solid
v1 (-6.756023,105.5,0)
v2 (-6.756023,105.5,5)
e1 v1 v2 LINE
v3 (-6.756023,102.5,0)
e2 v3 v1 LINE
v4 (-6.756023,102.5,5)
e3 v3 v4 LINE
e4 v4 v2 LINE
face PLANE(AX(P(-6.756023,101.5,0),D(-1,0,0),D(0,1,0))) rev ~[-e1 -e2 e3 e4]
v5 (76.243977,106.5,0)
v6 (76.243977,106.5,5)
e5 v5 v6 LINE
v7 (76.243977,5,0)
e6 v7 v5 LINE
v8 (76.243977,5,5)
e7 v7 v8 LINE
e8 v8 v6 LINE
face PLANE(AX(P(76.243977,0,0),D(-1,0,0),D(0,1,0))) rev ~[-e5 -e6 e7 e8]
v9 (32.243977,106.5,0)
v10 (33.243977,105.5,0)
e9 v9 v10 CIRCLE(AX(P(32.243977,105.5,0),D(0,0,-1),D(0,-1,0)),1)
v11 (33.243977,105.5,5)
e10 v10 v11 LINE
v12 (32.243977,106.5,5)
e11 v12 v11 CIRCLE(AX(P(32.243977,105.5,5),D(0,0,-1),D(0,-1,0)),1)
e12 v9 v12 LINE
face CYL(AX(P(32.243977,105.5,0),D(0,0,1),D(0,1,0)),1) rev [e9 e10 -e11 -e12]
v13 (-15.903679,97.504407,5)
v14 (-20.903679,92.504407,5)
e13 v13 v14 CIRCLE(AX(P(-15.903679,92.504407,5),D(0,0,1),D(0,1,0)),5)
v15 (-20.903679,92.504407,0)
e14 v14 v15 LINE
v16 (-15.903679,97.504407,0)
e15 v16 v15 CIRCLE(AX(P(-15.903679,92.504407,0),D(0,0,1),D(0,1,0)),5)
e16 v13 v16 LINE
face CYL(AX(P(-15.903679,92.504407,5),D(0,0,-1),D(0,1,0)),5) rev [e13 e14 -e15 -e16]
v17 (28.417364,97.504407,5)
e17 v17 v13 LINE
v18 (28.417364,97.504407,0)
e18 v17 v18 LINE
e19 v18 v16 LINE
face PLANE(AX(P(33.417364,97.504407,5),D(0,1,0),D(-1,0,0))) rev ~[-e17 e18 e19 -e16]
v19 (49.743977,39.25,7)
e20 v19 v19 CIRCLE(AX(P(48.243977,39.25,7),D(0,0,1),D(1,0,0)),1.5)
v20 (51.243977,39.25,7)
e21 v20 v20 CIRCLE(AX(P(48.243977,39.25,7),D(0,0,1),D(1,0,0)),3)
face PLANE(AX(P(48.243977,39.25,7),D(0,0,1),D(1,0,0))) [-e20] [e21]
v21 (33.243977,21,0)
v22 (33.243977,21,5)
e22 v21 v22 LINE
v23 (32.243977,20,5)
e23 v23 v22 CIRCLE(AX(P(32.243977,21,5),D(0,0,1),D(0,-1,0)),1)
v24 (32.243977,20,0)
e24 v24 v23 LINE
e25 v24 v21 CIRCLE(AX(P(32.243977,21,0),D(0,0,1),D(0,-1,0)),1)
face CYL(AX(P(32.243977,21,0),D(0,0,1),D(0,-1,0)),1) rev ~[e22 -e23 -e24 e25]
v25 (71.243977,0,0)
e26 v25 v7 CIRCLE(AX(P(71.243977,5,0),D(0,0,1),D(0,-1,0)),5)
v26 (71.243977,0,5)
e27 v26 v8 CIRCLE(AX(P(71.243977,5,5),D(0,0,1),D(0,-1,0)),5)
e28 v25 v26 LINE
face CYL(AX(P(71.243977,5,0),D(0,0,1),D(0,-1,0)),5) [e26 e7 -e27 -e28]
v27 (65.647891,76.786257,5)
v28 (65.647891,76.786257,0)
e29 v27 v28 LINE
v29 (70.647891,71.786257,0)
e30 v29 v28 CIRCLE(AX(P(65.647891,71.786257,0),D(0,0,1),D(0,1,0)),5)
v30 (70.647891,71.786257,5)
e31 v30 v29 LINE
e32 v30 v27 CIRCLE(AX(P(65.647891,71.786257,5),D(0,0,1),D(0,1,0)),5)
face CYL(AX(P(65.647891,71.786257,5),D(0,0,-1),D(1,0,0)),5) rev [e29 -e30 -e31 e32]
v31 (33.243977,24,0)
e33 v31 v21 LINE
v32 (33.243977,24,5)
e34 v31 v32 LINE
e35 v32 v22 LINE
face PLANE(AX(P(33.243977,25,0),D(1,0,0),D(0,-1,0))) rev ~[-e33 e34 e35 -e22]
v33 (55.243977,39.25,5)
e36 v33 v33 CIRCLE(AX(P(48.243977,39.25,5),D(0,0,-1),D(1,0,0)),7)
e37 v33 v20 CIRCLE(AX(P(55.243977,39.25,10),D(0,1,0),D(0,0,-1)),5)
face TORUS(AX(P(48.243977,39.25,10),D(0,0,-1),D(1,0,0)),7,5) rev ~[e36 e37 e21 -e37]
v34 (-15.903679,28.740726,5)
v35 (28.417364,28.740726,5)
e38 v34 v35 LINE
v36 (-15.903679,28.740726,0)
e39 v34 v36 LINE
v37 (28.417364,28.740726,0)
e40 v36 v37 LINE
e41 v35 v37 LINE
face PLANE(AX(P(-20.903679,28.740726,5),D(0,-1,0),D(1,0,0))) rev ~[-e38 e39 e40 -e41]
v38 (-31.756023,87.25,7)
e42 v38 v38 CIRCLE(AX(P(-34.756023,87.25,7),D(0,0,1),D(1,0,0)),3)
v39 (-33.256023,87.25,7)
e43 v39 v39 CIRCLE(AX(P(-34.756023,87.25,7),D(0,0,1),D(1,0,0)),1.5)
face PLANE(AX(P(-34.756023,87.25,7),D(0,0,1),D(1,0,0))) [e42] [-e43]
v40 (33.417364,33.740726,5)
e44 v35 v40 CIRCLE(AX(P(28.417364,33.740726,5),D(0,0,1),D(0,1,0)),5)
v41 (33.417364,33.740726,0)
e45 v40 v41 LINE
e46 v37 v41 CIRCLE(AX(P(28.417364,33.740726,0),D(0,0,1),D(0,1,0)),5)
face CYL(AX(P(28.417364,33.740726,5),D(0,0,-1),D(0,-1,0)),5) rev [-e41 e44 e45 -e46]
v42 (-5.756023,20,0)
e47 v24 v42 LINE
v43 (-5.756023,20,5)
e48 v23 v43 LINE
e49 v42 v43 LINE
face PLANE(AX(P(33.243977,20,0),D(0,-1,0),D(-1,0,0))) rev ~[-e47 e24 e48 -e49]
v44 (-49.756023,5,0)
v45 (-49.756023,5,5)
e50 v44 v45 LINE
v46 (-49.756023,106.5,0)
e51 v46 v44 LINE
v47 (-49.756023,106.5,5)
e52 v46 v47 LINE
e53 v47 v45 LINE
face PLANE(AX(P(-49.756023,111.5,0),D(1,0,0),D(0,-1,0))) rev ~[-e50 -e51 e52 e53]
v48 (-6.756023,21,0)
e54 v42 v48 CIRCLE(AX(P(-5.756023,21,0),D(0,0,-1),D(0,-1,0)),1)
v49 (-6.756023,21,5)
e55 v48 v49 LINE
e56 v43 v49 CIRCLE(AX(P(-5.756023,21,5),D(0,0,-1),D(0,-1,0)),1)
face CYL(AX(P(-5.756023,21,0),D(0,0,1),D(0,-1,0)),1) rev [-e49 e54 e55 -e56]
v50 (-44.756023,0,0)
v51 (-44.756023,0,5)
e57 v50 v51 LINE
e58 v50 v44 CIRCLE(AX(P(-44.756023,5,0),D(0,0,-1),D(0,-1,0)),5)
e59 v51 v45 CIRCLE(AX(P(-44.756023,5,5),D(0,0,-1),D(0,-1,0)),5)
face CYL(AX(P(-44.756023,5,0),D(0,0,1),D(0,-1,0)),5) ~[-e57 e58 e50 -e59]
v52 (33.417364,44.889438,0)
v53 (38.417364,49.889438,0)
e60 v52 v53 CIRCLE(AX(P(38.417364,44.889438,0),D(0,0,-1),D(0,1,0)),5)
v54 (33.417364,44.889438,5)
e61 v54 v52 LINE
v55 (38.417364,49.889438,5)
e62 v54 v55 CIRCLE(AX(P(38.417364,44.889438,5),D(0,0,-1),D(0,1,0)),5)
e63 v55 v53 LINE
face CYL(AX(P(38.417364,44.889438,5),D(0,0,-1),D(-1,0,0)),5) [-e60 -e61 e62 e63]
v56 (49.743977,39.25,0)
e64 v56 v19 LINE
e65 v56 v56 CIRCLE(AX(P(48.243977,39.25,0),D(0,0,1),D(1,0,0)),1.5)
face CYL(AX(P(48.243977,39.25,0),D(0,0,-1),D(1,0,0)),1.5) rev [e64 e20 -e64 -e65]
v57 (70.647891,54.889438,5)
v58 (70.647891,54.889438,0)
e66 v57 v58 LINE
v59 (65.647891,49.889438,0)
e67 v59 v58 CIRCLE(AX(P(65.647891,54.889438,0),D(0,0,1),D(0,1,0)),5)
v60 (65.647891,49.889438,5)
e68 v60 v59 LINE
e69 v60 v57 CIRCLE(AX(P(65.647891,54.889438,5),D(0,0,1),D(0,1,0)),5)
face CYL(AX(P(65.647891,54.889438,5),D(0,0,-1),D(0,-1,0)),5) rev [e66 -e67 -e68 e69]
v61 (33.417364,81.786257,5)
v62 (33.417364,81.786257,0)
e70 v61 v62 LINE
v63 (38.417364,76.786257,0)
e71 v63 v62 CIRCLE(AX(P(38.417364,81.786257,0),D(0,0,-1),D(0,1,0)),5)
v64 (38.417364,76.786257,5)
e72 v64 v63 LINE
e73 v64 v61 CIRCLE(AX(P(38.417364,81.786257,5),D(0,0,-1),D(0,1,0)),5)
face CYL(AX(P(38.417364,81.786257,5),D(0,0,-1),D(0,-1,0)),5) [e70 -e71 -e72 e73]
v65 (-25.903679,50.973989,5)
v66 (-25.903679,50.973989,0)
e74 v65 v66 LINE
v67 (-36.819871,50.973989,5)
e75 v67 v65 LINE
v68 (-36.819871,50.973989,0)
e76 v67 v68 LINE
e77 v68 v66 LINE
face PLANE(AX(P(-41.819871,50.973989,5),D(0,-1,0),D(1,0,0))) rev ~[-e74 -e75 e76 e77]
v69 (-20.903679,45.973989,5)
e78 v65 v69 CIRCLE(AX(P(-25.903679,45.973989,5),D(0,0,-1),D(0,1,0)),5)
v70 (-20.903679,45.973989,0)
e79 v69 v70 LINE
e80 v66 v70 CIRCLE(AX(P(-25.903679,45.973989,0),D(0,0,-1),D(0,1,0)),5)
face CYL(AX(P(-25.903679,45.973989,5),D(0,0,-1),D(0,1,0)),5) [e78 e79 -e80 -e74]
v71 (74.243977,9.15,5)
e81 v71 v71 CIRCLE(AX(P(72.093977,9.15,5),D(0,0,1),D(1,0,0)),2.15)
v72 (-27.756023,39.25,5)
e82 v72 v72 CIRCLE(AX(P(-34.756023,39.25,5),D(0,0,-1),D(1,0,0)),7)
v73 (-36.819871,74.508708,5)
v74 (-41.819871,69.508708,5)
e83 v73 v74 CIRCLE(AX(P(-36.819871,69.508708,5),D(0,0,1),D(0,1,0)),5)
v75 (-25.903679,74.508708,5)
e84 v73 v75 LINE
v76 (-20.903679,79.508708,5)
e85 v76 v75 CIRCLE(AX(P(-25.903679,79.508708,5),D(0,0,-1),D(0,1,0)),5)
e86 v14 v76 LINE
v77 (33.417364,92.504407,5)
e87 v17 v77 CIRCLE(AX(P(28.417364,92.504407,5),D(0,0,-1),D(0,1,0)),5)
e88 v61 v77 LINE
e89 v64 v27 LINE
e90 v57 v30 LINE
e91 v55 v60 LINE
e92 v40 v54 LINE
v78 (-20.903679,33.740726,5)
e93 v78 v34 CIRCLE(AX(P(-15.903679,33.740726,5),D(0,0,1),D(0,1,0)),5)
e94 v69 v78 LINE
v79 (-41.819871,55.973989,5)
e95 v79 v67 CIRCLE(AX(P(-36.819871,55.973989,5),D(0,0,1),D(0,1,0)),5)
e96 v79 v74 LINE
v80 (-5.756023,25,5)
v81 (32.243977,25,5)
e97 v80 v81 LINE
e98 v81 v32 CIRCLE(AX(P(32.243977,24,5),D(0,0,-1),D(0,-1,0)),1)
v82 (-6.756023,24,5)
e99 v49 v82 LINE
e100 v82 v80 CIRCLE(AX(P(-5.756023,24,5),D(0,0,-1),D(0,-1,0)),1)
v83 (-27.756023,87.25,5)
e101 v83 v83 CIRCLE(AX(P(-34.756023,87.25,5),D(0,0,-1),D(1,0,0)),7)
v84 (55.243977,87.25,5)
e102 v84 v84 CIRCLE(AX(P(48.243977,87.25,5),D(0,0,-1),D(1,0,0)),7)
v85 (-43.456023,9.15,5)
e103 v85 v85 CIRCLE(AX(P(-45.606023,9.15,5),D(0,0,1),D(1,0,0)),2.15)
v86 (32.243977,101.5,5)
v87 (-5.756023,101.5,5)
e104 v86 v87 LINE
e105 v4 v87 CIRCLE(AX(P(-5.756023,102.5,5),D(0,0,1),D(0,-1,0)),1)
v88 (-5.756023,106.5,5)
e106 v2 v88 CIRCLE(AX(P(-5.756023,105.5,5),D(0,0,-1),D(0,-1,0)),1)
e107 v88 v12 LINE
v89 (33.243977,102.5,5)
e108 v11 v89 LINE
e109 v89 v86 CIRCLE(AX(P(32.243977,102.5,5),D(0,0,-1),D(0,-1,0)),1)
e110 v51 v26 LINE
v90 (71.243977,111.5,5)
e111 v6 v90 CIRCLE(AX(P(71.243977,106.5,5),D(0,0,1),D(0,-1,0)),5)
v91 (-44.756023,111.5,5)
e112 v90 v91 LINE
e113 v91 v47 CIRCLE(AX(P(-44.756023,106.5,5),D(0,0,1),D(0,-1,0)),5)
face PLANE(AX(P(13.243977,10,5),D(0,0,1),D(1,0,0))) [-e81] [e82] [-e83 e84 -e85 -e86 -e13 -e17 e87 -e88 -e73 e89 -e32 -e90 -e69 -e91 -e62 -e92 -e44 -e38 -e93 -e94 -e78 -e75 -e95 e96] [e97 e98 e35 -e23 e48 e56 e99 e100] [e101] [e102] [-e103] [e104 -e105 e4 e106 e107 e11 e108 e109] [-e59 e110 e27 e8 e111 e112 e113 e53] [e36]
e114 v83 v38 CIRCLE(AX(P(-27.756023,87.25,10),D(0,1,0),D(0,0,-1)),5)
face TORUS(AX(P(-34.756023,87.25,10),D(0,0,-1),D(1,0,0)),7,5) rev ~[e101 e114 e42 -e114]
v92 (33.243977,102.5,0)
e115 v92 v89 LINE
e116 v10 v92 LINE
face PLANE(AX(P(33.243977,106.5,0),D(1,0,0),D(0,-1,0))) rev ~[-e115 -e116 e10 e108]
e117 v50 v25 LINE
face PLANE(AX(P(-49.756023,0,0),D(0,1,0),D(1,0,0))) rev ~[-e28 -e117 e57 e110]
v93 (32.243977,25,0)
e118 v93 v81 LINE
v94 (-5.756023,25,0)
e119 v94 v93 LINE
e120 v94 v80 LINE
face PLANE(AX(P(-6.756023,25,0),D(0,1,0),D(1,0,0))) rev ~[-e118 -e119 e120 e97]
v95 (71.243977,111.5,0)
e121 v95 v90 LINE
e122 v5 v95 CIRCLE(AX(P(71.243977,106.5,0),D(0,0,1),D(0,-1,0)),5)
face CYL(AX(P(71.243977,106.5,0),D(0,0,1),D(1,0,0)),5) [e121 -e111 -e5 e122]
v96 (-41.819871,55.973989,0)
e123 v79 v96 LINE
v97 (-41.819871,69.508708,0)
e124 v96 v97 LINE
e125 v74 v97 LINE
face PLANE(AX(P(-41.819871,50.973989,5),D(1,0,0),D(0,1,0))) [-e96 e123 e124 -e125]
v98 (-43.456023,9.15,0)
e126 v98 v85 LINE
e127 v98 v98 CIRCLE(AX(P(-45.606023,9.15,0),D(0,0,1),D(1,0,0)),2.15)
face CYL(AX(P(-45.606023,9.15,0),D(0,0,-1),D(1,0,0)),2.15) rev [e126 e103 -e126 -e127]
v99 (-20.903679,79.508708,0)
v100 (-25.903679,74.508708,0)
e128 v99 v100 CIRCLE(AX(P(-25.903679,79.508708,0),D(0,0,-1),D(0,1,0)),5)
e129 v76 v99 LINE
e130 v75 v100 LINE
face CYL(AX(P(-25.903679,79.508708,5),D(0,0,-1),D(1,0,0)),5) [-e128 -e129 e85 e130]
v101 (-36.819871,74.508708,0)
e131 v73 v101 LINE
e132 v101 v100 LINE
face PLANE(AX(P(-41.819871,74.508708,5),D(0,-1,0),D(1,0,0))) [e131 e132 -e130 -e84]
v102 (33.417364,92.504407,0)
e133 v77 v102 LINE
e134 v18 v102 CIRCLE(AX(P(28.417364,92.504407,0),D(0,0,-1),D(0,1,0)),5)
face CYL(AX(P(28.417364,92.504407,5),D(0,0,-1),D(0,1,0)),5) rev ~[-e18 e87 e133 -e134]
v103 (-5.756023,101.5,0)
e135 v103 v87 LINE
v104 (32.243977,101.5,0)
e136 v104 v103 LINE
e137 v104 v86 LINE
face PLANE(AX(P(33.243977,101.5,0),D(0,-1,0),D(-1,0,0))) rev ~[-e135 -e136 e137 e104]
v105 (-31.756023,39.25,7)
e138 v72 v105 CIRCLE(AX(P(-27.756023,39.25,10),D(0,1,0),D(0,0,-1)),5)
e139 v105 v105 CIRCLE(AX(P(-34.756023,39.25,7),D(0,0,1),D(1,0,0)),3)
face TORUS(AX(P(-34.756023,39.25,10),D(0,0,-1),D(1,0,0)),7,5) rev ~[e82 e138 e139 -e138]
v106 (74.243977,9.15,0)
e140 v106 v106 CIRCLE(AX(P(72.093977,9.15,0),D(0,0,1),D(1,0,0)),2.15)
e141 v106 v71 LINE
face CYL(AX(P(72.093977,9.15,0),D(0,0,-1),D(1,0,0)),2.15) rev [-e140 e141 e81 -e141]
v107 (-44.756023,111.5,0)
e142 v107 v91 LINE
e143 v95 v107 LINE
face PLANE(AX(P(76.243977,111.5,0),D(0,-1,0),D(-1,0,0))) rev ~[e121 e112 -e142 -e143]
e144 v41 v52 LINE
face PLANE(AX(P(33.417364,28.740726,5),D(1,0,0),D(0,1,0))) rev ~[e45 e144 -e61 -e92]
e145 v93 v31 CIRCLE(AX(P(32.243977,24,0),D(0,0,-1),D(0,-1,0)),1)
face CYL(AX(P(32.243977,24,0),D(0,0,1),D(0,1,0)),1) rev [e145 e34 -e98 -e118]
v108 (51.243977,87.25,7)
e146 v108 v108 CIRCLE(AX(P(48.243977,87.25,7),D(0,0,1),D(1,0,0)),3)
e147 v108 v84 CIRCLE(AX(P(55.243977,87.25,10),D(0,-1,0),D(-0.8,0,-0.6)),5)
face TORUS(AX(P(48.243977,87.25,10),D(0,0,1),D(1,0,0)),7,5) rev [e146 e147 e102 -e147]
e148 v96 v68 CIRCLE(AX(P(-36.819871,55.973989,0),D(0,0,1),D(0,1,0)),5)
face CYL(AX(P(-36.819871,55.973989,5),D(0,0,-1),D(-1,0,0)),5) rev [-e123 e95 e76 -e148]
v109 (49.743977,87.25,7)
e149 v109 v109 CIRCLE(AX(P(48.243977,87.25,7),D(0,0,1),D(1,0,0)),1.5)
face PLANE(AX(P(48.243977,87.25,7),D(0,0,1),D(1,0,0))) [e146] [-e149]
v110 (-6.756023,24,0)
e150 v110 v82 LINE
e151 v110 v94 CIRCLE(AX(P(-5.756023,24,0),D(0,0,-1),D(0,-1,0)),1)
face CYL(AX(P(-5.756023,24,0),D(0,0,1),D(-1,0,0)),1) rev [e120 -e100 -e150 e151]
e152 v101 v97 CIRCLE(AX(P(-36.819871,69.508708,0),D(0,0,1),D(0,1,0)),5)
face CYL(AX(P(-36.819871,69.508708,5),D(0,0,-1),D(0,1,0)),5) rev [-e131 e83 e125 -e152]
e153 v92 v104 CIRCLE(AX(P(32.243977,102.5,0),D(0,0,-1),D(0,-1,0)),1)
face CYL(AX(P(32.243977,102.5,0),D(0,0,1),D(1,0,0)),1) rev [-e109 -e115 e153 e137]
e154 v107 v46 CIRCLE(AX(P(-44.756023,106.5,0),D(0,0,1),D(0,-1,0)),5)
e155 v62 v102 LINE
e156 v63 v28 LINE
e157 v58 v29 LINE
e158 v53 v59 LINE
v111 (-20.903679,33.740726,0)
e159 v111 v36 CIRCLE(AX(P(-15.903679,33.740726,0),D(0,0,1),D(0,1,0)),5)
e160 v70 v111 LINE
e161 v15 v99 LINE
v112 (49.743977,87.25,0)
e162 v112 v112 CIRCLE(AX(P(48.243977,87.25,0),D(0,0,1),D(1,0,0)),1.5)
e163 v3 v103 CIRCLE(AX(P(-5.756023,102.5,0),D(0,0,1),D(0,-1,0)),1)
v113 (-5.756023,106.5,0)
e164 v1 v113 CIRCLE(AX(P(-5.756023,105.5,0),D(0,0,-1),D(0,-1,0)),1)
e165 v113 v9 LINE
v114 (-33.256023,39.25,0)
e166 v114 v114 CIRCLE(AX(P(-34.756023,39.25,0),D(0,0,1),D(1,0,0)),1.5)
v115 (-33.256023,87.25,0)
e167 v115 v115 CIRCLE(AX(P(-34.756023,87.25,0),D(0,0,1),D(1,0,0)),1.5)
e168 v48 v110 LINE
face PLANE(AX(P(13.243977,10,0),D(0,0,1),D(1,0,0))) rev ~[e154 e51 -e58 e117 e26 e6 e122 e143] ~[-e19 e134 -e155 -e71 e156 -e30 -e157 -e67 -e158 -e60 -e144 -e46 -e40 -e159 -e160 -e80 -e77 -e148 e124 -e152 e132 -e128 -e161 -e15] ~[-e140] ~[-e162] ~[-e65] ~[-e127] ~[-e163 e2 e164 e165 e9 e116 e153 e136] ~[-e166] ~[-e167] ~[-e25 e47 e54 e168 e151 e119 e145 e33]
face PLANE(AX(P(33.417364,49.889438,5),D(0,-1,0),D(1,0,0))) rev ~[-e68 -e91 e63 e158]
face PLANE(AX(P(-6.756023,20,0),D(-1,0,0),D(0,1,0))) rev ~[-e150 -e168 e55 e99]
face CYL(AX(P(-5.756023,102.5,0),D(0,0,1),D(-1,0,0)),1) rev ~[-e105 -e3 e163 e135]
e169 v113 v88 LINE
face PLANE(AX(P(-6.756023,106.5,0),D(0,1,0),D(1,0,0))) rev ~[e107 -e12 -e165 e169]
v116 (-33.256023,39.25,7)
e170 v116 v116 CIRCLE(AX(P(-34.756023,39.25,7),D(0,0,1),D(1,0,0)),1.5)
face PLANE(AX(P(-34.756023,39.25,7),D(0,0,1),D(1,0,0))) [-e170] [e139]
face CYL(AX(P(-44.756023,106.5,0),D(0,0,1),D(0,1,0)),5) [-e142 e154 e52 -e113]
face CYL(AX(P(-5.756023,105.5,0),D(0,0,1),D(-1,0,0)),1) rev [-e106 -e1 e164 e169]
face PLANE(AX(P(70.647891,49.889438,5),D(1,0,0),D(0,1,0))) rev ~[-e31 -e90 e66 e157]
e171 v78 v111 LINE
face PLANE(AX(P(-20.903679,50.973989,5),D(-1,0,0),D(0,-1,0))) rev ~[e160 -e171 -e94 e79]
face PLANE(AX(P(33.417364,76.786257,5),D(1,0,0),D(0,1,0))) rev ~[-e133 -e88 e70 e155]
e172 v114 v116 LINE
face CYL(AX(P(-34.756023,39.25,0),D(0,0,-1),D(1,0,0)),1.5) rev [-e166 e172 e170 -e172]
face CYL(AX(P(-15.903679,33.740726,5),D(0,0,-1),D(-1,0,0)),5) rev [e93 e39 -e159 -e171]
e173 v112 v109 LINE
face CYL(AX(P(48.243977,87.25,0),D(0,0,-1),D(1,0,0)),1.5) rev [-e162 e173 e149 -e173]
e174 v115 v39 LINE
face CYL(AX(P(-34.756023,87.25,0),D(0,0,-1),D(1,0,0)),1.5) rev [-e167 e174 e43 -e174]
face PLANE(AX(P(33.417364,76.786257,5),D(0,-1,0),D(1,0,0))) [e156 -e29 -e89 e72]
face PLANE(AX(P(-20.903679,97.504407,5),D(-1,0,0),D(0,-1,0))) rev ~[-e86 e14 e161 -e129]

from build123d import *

# Parameters (mm, degrees)
F0_R     = 2.15
F0_R_2   = 3
F0_R_3   = 1.5
F0_R_4   = 5
F1_DEPTH = 5
F2_R     = 1
F3_R     = 5
F4_DEPTH = 7
F6_W     = 20.916191861
F6_H     = 23.5347189009
F6_W_2   = 37.2305270284
F6_H_2   = 26.8968194723
F7_DEPTH = 25
F8_R     = 5


# Not quite as in the source:
# - a fillet or chamfer that OpenCascade refuses, or shapes differently, is made with other operations: its cross-section is extruded or revolved along the edge and cut away or added


with BuildPart() as f1:
    # F0 (on Top) → F1 (new body)
    with BuildSketch(Plane.XY):
        Polygon((-49.7560231508, 20), (-49.7560231508, 0), (76.2439768492, 0), (76.2439768492, 20), (33.2439768492, 20), (-6.7560231508, 20), align=None)
        with Locations((-45.6060231508, 9.15)):
            Circle(F0_R, mode=Mode.SUBTRACT)
        with Locations((72.0939768492, 9.15)):
            Circle(F0_R, mode=Mode.SUBTRACT)
        Polygon((-49.7560231508, 106.5), (-49.7560231508, 20), (-6.7560231508, 20), (-6.7560231508, 25), (33.2439768492, 25), (33.2439768492, 20), (76.2439768492, 20), (76.2439768492, 106.5), (33.2439768492, 106.5), (33.2439768492, 101.5), (-6.7560231508, 101.5), (-6.7560231508, 106.5), align=None)
        with Locations((-34.7560231508, 39.25)):
            Circle(F0_R_2, mode=Mode.SUBTRACT)
        with Locations((3.2439768492, 53.25)):
            Circle(F0_R_3, mode=Mode.SUBTRACT)
        with Locations((23.2439768492, 53.25)):
            Circle(F0_R_3, mode=Mode.SUBTRACT)
        with Locations((48.2439768492, 39.25)):
            Circle(F0_R_2, mode=Mode.SUBTRACT)
        with Locations((3.2439768492, 73.25)):
            Circle(F0_R_3, mode=Mode.SUBTRACT)
        with Locations((-34.7560231508, 87.25)):
            Circle(F0_R_2, mode=Mode.SUBTRACT)
        with Locations((13.2439768492, 63.25)):
            Circle(F0_R_4, mode=Mode.SUBTRACT)
        with Locations((23.2439768492, 73.25)):
            Circle(F0_R_3, mode=Mode.SUBTRACT)
        with Locations((48.2439768492, 87.25)):
            Circle(F0_R_2, mode=Mode.SUBTRACT)
        Polygon((-49.7560231508, 111.5), (-49.7560231508, 106.5), (-6.7560231508, 106.5), (33.2439768492, 106.5), (76.2439768492, 106.5), (76.2439768492, 111.5), align=None)
        with Locations((-34.7560231508, 39.25)):
            Circle(F0_R_2)
        with Locations((-34.7560231508, 39.25)):
            Circle(F0_R_3, mode=Mode.SUBTRACT)
        with Locations((-34.7560231508, 87.25)):
            Circle(F0_R_2)
        with Locations((-34.7560231508, 87.25)):
            Circle(F0_R_3, mode=Mode.SUBTRACT)
        with Locations((48.2439768492, 39.25)):
            Circle(F0_R_2)
        with Locations((48.2439768492, 39.25)):
            Circle(F0_R_3, mode=Mode.SUBTRACT)
        with Locations((48.2439768492, 87.25)):
            Circle(F0_R_2)
        with Locations((48.2439768492, 87.25)):
            Circle(F0_R_3, mode=Mode.SUBTRACT)
        with Locations((13.2439768492, 63.25)):
            Circle(F0_R_4)
        with Locations((3.2439768492, 73.25)):
            Circle(F0_R_3)
        with Locations((3.2439768492, 53.25)):
            Circle(F0_R_3)
        with Locations((23.2439768492, 53.25)):
            Circle(F0_R_3)
        with Locations((23.2439768492, 73.25)):
            Circle(F0_R_3)
    extrude(amount=F1_DEPTH)

    # F2
    f2_edges = [f1.edges().sort_by_distance(p)[0] for p in [
        (-6.756023, 25, 2.5),
        (33.243977, 25, 2.5),
        (-6.756023, 20, 2.5),
        (33.243977, 20, 2.5),
        (-6.756023, 101.5, 2.5),
        (-6.756023, 106.5, 2.5),
        (33.243977, 106.5, 2.5),
        (33.243977, 101.5, 2.5),
    ]]
    fillet(f2_edges, radius=F2_R)

    # F3
    f3_edges = [f1.edges().sort_by_distance(p)[0] for p in [
        (-49.756023, 0, 2.5),
        (76.243977, 0, 2.5),
        (76.243977, 111.5, 2.5),
        (-49.756023, 111.5, 2.5),
    ]]
    fillet(f3_edges, radius=F3_R)

    # F0 (on Top) → F4 (join)
    with BuildSketch(Plane.XY):
        with Locations((-34.7560231508, 87.25)):
            Circle(F0_R_2)
        with Locations((-34.7560231508, 87.25)):
            Circle(F0_R_3, mode=Mode.SUBTRACT)
        with Locations((-34.7560231508, 39.25)):
            Circle(F0_R_2)
        with Locations((-34.7560231508, 39.25)):
            Circle(F0_R_3, mode=Mode.SUBTRACT)
        with Locations((48.2439768492, 87.25)):
            Circle(F0_R_2)
        with Locations((48.2439768492, 87.25)):
            Circle(F0_R_3, mode=Mode.SUBTRACT)
        with Locations((48.2439768492, 39.25)):
            Circle(F0_R_2)
        with Locations((48.2439768492, 39.25)):
            Circle(F0_R_3, mode=Mode.SUBTRACT)
    extrude(amount=F4_DEPTH)

    # F5: fillet of radius 5 on 4 edges, made by hand

    # F5_s1 → F5_t2 (revolve)
    with BuildSketch(Plane.XZ.offset(-87.25)):
        with BuildLine():
            ThreePointArc((-27.7560231508, 5), (-29.9920911283, 5.527864045), (-31.7560231508, 7))
            Line((-31.7560231508, 7), (-31.7560231508, 5))
            Line((-31.7560231508, 5), (-27.7560231508, 5))
        make_face()
    revolve(axis=Axis((-34.7560231508, 87.25, 5), (0, 0, -1)))

    # F5_s3 → F5_t4 (revolve)
    with BuildSketch(Plane.XZ.offset(-39.25)):
        with BuildLine():
            ThreePointArc((-27.7560231508, 5), (-29.9920911283, 5.527864045), (-31.7560231508, 7))
            Line((-31.7560231508, 7), (-31.7560231508, 5))
            Line((-31.7560231508, 5), (-27.7560231508, 5))
        make_face()
    revolve(axis=Axis((-34.7560231508, 39.25, 5), (0, 0, -1)))

    # F5_s5 → F5_t6 (revolve)
    with BuildSketch(Plane.XZ.offset(-39.25)):
        with BuildLine():
            ThreePointArc((55.2439768492, 5), (53.0079088717, 5.527864045), (51.2439768492, 7))
            Line((51.2439768492, 7), (51.2439768492, 5))
            Line((51.2439768492, 5), (55.2439768492, 5))
        make_face()
    revolve(axis=Axis((48.2439768492, 39.25, 5), (0, 0, -1)))

    # F5_s7 → F5_t8 (revolve)
    with BuildSketch(Plane.XZ.offset(-87.25)):
        with BuildLine():
            ThreePointArc((51.2439768492, 7), (53.0079088717, 5.527864045), (55.2439768492, 5))
            Line((55.2439768492, 5), (51.2439768492, 5))
            Line((51.2439768492, 5), (51.2439768492, 7))
        make_face()
    revolve(axis=Axis((48.2439768492, 87.25, 5), (0, 0, -1)))

    # F6 (on face) → F7 (cut)
    with BuildSketch(Plane.XY.offset(5)):
        Polygon((33.4173643496, 97.5044071674), (-20.9036788438, 97.5044071674), (-20.9036788438, 74.5087079704), (-20.9036788438, 50.9739890695), (-20.9036788438, 28.7407264113), (33.4173643496, 28.7407264113), (33.4173643496, 49.8894378543), (33.4173643496, 76.7862573266), align=None)
        with Locations((-31.3617747743, 62.7413485199)):
            Rectangle(F6_W, F6_H)
        with Locations((52.0326278638, 63.3378475904)):
            Rectangle(F6_W_2, F6_H_2)
    extrude(amount=-F7_DEPTH, mode=Mode.SUBTRACT)

    # F8
    f8_edges = [f1.edges().sort_by_distance(p)[0] for p in [
        (-20.903679, 74.508708, 2.5),
        (33.417364, 76.786257, 2.5),
        (33.417364, 49.889438, 2.5),
        (-20.903679, 50.973989, 2.5),
        (-41.819871, 50.973989, 2.5),
        (-41.819871, 74.508708, 2.5),
        (-20.903679, 97.504407, 2.5),
        (33.417364, 97.504407, 2.5),
        (70.647891, 76.786257, 2.5),
        (70.647891, 49.889438, 2.5),
        (33.417364, 28.740726, 2.5),
        (-20.903679, 28.740726, 2.5),
    ]]
    fillet(f8_edges, radius=F8_R)


solid = f1.part
